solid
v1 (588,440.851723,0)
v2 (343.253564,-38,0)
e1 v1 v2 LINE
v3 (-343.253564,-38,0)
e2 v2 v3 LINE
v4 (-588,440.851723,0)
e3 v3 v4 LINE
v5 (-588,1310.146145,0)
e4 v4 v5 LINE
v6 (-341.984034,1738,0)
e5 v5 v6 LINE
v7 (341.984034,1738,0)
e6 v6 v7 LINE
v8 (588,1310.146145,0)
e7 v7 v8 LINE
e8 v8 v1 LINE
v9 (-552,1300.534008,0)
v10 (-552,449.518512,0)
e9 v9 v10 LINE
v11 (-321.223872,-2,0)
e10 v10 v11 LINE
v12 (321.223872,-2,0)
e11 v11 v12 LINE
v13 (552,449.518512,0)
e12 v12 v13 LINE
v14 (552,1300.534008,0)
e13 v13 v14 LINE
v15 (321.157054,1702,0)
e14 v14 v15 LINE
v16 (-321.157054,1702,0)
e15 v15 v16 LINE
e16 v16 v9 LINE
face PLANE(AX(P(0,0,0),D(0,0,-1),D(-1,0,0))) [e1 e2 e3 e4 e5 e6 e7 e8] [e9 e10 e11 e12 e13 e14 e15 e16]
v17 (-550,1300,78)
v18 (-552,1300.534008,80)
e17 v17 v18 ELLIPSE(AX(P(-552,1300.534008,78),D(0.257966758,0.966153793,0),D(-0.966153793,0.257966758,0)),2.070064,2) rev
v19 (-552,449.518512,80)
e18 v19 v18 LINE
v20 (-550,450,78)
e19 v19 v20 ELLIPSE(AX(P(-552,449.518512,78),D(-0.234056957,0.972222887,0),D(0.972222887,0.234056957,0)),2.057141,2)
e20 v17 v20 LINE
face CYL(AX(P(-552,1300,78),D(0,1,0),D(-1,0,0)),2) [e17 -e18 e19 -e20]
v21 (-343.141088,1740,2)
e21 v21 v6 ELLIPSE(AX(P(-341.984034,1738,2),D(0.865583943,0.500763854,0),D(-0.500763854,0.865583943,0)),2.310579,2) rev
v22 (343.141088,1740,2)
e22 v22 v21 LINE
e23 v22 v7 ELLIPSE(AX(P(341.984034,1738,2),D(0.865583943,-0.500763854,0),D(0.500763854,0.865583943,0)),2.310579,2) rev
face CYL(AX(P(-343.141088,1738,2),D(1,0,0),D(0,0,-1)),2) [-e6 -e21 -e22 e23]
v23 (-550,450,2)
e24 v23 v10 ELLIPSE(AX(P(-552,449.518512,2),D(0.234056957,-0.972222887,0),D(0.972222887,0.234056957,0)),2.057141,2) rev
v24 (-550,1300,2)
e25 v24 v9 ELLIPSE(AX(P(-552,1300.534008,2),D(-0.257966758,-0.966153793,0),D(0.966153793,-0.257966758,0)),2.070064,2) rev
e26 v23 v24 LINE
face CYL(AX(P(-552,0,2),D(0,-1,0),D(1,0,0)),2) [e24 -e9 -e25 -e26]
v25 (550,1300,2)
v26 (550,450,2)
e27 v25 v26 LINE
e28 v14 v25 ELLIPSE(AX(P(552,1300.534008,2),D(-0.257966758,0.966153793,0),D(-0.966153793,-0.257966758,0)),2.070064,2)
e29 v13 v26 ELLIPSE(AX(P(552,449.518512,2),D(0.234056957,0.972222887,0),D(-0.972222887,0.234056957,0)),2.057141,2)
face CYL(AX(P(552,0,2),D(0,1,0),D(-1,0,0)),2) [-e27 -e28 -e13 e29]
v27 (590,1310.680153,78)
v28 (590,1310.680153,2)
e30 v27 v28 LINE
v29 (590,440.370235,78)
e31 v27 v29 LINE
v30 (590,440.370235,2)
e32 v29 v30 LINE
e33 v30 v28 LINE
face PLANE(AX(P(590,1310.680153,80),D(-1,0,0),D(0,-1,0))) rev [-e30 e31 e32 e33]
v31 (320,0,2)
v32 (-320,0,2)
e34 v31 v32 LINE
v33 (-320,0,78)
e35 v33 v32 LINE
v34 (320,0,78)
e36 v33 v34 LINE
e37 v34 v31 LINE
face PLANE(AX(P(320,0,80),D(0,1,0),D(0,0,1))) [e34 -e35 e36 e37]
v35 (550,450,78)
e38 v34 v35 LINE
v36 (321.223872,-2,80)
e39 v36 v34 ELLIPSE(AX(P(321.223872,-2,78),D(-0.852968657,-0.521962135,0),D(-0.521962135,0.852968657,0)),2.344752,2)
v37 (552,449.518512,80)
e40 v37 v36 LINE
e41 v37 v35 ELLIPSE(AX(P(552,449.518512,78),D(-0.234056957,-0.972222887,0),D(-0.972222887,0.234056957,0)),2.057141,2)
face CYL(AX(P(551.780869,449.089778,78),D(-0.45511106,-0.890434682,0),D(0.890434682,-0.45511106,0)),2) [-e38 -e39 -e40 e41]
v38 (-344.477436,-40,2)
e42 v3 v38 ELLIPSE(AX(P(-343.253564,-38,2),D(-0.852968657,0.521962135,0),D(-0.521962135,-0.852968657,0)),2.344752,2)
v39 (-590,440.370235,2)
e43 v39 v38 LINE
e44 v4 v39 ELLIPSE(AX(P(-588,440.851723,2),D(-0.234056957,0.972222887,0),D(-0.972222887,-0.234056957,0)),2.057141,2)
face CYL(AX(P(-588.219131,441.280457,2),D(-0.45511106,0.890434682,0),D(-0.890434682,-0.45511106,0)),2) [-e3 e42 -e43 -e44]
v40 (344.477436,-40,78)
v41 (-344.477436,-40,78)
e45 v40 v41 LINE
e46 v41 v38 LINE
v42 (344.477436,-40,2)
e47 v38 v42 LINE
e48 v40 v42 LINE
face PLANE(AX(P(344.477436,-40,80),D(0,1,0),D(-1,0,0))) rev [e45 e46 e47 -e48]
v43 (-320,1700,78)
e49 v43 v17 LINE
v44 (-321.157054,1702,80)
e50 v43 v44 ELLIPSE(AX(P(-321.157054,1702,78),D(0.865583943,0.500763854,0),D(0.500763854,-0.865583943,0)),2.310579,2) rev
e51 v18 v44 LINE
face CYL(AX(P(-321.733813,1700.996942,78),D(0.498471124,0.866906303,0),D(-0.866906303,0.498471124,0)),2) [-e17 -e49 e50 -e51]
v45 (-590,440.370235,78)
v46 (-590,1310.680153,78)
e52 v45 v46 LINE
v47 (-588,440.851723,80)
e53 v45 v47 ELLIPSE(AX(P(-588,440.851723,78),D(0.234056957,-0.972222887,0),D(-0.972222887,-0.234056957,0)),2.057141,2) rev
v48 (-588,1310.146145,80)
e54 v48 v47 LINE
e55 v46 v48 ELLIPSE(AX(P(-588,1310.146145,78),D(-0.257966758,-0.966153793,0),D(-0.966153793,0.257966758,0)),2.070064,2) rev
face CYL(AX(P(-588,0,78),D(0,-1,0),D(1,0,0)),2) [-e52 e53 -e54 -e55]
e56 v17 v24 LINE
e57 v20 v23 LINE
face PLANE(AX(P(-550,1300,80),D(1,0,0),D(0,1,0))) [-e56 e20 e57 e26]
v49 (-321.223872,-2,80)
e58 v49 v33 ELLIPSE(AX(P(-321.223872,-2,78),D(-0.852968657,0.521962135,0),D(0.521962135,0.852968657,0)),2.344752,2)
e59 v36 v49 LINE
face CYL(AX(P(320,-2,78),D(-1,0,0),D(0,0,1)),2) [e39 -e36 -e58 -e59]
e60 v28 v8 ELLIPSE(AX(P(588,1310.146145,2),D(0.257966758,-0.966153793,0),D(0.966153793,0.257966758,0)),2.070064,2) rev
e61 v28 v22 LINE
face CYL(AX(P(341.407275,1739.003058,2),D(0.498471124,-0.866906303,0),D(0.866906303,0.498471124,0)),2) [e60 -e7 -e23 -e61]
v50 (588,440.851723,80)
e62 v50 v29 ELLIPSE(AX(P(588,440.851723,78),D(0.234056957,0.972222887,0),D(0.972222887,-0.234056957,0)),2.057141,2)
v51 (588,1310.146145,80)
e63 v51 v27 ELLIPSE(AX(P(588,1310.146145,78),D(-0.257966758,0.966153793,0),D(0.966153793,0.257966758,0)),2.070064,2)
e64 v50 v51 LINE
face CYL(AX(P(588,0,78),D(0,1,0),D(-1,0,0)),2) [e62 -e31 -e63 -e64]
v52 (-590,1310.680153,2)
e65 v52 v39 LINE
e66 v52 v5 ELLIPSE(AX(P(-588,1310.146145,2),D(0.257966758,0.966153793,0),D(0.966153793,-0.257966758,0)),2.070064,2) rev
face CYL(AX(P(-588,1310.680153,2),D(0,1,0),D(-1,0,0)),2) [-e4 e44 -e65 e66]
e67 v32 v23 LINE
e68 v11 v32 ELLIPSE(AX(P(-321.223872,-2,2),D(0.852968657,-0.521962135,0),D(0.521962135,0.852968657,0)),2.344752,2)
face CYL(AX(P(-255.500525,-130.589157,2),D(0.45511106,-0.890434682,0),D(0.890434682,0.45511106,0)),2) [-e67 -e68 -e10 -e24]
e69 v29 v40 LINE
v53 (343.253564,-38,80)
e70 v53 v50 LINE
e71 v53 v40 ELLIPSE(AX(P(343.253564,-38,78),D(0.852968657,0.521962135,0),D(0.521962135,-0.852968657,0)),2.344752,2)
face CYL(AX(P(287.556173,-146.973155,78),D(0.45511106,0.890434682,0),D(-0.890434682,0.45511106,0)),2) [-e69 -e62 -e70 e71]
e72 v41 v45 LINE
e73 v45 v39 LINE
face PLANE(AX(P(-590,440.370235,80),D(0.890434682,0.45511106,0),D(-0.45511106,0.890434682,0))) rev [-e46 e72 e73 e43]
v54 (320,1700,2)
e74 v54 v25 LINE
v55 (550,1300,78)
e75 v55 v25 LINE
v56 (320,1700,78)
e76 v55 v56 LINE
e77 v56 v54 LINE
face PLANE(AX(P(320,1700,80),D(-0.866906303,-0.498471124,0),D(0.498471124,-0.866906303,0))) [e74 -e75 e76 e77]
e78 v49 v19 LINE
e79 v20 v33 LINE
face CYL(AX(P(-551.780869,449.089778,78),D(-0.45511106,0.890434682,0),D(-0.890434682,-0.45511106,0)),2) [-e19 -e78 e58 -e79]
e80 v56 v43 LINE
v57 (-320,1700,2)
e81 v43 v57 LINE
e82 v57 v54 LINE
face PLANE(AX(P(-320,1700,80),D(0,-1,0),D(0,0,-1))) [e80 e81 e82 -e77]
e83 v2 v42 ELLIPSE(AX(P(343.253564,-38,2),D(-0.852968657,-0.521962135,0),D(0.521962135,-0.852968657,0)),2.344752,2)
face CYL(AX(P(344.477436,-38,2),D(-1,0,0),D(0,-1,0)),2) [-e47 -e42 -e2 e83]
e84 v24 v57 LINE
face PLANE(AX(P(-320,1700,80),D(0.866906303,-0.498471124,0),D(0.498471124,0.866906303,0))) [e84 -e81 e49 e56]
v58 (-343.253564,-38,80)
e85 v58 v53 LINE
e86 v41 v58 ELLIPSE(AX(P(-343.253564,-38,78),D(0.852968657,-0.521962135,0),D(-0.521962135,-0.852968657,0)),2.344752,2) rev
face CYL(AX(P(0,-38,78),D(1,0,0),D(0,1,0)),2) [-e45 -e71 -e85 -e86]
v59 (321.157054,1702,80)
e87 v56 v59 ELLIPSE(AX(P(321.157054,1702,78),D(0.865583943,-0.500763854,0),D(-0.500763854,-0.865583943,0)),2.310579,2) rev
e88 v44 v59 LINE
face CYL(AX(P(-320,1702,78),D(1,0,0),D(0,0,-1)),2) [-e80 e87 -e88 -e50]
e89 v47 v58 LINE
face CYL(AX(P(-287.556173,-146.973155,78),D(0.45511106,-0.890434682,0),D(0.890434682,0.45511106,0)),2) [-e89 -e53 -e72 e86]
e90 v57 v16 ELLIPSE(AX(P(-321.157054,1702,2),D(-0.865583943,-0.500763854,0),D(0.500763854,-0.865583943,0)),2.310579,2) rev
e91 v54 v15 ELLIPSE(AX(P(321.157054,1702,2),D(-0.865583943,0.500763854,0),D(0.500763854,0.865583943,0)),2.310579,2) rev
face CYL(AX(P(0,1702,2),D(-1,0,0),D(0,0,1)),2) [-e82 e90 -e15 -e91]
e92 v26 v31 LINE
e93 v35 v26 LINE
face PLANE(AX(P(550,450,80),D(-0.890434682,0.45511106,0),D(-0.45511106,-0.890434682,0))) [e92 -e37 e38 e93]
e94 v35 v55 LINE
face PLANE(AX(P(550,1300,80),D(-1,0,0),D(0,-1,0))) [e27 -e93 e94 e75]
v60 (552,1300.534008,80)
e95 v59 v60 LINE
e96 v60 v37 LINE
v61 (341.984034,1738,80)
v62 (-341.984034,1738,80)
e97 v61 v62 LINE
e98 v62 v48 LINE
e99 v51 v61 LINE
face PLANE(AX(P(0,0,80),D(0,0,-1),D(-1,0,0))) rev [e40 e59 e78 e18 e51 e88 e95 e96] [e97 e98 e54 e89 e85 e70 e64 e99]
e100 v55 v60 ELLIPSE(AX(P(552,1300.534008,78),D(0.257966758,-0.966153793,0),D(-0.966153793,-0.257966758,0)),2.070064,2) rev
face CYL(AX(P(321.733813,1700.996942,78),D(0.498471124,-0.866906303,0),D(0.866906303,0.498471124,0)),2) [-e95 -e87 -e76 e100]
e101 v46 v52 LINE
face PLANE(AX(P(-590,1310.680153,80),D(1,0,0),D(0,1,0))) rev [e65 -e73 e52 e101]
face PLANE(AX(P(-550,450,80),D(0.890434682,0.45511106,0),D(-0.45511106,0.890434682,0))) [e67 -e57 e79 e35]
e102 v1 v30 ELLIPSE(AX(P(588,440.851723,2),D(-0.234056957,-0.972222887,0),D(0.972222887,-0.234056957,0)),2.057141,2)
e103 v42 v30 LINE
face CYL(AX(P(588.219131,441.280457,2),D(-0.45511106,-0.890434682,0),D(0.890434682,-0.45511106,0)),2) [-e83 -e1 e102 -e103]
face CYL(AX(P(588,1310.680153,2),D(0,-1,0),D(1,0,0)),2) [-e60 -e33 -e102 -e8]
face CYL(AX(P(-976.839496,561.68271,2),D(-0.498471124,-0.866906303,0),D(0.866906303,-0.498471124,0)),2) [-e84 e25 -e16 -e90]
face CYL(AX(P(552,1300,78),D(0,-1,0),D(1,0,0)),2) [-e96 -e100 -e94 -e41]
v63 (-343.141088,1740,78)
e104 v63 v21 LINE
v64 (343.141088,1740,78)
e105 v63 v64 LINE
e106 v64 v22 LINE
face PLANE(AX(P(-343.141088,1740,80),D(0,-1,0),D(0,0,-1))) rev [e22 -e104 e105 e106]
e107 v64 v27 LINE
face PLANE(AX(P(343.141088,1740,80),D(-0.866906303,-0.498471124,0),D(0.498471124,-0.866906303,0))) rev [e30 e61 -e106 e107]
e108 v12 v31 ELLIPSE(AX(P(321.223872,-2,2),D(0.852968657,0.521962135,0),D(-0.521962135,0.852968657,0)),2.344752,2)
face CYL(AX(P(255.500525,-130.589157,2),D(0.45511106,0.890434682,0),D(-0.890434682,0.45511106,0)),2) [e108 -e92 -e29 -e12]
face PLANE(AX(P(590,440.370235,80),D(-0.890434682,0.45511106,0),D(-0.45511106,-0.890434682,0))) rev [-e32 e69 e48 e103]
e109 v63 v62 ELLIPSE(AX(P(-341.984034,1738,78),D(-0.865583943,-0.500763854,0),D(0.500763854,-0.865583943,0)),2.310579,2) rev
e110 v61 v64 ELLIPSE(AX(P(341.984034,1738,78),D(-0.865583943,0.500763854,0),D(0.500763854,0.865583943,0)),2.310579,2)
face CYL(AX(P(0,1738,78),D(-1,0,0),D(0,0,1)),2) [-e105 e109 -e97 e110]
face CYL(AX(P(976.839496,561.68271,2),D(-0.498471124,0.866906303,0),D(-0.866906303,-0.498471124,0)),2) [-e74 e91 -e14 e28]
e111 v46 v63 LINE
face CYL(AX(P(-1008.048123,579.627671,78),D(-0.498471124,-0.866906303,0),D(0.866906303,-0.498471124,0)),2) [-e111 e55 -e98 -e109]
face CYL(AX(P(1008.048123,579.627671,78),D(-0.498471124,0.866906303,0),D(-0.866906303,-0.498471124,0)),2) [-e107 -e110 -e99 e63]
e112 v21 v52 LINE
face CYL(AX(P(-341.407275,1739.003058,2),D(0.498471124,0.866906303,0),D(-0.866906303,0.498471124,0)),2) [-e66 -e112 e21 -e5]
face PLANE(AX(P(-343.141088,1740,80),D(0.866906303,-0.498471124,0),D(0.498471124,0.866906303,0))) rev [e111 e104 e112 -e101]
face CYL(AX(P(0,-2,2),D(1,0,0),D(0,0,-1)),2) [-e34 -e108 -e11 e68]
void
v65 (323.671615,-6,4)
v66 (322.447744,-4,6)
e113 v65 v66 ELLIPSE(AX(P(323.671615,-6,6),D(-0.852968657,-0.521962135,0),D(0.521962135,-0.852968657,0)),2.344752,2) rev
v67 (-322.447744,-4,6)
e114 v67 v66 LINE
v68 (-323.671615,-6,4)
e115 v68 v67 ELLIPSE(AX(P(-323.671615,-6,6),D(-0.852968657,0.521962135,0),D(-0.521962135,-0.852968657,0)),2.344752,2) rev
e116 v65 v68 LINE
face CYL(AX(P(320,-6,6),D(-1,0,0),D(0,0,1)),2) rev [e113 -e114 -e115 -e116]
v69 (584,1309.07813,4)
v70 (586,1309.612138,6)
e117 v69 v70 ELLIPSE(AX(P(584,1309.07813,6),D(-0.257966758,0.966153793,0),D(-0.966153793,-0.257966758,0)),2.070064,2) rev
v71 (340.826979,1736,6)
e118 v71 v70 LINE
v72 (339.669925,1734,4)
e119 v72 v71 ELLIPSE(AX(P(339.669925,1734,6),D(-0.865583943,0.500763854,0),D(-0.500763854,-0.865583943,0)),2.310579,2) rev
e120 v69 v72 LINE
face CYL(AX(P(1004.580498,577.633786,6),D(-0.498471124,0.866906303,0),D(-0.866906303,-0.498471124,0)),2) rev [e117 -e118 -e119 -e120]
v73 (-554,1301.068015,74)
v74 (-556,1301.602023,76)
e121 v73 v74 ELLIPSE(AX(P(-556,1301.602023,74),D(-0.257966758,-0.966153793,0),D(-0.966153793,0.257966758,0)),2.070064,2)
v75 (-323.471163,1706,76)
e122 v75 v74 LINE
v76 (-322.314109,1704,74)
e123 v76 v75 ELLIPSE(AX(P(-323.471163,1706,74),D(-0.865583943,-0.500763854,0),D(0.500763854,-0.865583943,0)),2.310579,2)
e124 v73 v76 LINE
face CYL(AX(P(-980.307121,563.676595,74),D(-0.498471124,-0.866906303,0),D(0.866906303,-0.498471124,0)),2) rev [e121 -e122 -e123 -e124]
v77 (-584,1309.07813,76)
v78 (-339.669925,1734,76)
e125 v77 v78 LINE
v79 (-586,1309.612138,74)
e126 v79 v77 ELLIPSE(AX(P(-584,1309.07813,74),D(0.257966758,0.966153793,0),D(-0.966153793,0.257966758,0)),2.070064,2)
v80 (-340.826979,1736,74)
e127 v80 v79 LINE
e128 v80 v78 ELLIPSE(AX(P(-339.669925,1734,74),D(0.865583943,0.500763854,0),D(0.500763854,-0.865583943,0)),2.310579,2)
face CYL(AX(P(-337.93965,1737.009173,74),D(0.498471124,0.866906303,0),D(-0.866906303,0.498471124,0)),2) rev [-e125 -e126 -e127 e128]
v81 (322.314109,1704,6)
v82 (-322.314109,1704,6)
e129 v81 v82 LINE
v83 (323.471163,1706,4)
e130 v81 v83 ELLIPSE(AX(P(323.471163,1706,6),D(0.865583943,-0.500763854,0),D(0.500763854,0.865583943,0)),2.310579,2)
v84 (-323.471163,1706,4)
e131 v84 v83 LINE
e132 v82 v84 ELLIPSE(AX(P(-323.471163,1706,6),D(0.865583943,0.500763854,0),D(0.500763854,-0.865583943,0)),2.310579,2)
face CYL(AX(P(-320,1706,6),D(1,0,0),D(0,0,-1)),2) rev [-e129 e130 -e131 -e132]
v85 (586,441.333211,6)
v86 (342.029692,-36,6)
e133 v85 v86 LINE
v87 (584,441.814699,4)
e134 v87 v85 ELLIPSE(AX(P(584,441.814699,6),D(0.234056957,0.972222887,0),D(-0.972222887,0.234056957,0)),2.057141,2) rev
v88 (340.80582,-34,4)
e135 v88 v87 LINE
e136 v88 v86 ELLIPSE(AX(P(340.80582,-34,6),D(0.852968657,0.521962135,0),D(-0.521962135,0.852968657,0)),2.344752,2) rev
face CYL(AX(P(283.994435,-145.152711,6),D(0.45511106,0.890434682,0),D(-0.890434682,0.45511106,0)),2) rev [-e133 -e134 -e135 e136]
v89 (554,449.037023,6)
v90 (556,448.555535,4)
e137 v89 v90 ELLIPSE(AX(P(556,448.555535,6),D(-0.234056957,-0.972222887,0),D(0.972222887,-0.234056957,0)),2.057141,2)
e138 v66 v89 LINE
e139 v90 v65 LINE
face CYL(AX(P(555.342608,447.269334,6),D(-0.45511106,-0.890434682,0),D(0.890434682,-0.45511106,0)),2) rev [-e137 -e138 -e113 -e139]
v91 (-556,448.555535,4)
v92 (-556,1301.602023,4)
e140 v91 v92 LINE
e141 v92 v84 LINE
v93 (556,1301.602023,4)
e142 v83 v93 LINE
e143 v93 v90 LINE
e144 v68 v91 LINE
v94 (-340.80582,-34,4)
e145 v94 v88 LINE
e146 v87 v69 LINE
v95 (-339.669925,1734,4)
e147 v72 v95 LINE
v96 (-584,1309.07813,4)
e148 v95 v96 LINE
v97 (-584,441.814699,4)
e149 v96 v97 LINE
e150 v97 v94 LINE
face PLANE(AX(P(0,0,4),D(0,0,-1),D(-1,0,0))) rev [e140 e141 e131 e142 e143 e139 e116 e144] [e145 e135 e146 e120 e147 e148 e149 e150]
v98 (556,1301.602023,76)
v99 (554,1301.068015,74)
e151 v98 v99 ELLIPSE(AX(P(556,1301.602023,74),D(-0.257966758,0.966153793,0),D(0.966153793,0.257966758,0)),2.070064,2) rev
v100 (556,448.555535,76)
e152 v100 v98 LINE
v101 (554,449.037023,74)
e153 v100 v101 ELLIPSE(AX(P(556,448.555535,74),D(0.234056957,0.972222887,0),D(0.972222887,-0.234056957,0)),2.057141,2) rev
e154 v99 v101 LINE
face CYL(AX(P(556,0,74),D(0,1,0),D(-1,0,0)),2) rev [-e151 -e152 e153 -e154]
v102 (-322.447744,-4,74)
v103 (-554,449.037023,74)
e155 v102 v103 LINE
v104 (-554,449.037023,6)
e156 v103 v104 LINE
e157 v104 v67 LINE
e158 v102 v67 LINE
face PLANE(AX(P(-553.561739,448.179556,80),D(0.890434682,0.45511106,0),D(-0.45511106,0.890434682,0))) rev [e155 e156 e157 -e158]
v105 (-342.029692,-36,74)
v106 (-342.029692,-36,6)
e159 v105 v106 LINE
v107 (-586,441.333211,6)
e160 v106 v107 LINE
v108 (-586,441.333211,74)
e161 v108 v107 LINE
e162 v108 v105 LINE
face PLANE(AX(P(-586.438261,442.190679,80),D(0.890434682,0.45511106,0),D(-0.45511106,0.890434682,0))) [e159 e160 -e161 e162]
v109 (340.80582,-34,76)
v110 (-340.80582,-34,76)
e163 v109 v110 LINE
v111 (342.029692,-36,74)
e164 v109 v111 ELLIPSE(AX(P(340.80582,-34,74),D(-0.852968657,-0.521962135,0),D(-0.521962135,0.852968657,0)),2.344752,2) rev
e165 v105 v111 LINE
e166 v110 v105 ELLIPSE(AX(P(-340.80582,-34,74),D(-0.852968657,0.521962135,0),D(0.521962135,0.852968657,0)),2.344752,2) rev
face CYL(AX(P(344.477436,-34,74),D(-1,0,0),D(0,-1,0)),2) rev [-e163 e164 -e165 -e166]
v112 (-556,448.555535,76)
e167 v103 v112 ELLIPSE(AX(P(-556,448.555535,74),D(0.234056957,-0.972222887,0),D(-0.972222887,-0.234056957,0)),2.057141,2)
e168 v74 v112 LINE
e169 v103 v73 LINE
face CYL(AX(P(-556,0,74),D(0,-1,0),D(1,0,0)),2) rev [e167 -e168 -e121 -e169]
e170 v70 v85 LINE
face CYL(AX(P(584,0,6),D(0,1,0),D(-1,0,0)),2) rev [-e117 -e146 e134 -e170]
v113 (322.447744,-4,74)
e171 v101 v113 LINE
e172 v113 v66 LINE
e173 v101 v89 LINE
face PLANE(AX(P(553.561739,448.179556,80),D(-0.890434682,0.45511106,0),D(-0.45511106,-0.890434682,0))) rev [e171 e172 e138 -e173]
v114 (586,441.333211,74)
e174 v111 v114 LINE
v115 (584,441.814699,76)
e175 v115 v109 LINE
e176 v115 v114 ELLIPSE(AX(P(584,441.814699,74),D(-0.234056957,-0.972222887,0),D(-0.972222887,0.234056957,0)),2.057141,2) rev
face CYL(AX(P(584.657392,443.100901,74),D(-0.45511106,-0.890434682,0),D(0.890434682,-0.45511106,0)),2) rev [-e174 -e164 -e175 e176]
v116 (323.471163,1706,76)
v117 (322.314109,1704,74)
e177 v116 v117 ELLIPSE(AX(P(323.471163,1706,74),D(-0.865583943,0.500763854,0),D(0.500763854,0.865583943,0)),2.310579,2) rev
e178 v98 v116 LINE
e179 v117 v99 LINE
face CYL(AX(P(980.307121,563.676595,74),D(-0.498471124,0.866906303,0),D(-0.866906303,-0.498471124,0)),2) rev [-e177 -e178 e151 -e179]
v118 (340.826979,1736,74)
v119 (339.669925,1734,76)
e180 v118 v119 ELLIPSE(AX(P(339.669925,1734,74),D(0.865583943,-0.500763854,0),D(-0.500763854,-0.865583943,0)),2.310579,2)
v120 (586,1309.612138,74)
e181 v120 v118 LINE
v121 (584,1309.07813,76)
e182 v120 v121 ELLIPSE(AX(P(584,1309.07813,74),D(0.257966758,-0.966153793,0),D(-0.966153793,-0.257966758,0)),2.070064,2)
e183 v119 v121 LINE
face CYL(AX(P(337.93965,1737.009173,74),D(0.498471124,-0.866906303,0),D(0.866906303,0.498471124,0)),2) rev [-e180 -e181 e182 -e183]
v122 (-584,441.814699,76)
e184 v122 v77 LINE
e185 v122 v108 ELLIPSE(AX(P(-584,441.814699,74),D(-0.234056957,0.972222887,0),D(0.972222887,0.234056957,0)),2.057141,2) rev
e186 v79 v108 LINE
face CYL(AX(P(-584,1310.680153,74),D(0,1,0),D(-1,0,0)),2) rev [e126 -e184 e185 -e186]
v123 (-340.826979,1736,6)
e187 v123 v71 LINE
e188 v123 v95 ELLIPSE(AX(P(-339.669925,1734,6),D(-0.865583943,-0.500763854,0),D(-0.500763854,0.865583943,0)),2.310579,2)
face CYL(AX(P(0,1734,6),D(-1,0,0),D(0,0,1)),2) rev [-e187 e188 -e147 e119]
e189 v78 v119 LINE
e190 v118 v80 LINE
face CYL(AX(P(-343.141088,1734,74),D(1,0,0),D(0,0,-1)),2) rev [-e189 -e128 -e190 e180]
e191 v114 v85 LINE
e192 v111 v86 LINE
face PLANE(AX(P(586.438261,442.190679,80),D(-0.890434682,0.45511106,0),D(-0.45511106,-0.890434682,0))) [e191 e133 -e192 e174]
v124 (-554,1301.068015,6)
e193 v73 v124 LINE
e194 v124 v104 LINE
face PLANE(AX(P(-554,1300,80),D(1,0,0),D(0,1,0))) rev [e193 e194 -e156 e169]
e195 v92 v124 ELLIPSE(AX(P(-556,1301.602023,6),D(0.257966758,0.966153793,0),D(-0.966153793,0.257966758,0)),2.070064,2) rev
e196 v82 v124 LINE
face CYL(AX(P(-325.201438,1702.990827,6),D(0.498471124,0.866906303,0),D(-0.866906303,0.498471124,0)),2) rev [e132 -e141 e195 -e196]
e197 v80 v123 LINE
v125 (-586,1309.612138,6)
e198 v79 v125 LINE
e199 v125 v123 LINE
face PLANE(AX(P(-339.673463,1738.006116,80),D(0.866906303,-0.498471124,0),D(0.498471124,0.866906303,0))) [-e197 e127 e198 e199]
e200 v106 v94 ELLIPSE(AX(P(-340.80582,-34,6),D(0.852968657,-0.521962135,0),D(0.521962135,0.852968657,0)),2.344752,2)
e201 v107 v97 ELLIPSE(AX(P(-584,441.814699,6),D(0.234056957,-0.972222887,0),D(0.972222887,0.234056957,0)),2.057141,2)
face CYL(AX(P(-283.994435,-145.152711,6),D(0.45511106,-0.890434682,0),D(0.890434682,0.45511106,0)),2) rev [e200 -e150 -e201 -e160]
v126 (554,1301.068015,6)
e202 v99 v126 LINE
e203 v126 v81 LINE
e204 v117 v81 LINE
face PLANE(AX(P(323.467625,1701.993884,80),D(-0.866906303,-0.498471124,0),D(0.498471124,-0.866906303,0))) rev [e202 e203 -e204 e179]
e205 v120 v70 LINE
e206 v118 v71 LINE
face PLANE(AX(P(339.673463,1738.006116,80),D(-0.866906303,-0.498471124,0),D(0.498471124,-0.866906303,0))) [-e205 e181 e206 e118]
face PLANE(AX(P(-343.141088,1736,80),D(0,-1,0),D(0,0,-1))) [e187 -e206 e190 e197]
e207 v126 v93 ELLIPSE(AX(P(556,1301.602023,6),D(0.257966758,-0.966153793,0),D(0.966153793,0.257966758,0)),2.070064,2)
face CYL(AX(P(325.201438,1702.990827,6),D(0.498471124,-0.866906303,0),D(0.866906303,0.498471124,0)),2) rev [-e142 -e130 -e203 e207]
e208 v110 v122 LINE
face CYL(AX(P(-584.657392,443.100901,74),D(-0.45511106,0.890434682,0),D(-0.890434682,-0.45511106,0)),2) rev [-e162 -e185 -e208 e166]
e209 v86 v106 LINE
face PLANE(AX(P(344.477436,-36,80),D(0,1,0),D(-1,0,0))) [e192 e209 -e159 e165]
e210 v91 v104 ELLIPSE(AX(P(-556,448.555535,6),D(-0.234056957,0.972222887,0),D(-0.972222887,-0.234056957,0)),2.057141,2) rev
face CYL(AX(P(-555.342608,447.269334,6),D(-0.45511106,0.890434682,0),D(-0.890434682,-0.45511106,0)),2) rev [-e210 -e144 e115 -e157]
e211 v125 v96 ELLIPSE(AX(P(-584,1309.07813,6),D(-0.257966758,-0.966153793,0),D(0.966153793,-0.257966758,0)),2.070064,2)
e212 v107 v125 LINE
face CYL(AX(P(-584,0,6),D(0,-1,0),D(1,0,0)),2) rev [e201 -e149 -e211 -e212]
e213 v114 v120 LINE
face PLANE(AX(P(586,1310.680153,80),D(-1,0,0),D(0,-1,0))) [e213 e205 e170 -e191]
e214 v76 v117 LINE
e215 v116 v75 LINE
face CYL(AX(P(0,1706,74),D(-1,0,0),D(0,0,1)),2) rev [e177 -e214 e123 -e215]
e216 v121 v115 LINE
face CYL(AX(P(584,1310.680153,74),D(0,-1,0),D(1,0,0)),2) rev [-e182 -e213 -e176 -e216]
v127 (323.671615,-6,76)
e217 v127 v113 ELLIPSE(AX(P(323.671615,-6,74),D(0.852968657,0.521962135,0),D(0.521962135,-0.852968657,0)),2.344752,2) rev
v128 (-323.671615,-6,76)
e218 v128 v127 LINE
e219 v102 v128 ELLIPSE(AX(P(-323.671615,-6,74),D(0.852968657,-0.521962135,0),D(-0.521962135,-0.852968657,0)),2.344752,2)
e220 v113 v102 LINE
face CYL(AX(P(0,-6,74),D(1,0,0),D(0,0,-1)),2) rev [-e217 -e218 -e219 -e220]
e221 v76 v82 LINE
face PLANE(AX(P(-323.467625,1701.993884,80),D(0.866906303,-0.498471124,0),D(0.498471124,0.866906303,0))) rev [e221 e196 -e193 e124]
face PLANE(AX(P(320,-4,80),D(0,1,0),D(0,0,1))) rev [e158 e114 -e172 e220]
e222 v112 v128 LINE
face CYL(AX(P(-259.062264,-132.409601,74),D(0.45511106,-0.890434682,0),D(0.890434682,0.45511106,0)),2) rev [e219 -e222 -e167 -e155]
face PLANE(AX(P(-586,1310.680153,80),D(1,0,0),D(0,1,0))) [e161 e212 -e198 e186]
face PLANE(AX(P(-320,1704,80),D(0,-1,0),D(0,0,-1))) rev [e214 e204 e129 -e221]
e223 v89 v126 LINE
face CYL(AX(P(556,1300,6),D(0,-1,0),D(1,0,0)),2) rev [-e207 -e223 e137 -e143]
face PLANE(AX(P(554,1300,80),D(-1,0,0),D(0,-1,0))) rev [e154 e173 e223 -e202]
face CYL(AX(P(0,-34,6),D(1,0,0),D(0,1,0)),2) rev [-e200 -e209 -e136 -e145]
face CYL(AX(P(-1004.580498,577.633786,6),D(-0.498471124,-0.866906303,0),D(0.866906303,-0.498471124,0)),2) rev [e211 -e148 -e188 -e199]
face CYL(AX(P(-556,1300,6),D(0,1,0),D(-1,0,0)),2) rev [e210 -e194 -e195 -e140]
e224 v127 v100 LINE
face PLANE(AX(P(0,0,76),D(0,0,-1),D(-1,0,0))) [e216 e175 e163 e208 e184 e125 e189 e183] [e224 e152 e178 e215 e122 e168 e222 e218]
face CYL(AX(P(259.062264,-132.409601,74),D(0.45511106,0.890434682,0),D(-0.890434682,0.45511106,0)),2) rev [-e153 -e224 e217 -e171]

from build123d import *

# Parameters (mm, degrees)
BOSS_EXTRU_1_DEPTH = 80
COQUE1_START       = 4
COQUE1_DEPTH       = 72
CONG_1_R           = 2


# Read off the part's stored shape, not the designer's step: Coque1
with BuildPart() as part:
    # Esquisse1 → Boss.-Extru.1 (new body)
    with BuildSketch(Plane.XY):
        Polygon((-590, 1310.680153009), (-590, 440.370234654), (-344.477435621, -40), (344.477435621, -40), (590, 440.370234654), (590, 1310.680153009), (343.14108798, 1740), (-343.14108798, 1740), align=None)
        Polygon((-320, 1700), (320, 1700), (550, 1300), (550, 450), (320, 0), (-320, 0), (-550, 450), (-550, 1300), align=None, mode=Mode.SUBTRACT)
    extrude(amount=BOSS_EXTRU_1_DEPTH)

    # Coque1 outline → Coque1 (cut)
    with BuildSketch(Plane.XY.offset(COQUE1_START)):
        Polygon((-340.826979182, 1736), (-586, 1309.612137708), (-586, 441.333211189), (-342.029692059, -36), (342.029692059, -36), (586, 441.333211189), (586, 1309.612137708), (340.826979182, 1736), align=None)
        Polygon((-554, 449.037023465), (-554, 1301.068015301), (-322.314108798, 1704), (322.314108798, 1704), (554, 1301.068015301), (554, 449.037023465), (322.447743562, -4), (-322.447743562, -4), align=None, mode=Mode.SUBTRACT)
    extrude(amount=COQUE1_DEPTH, mode=Mode.SUBTRACT)

    # Congé1
    cong_1_edges = [part.edges().sort_by_distance(p)[0] for p in [
        (-467.238717811, 200.185117327, 80),
        (-590, 875.525193832, 0),
        (-466.57054399, 1525.340076505, 0),
        (0, -40, 80),
        (467.238717811, 200.185117327, 80),
        (590, 875.525193832, 80),
        (466.57054399, 1525.340076505, 80),
        (0, 1740, 80),
        (-435, 1500, 0),
        (-550, 875, 0),
        (-435, 225, 0),
        (0, 0, 0),
        (435, 225, 0),
        (550, 875, 0),
        (435, 1500, 0),
        (0, 1700, 0),
        (-435, 1500, 80),
        (-550, 875, 80),
        (-435, 225, 80),
        (0, 0, 80),
        (435, 225, 80),
        (550, 875, 80),
        (435, 1500, 80),
        (0, 1700, 80),
        (-466.57054399, 1525.340076505, 80),
        (-463.413489591, 1522.806068854, 76),
        (-586, 875.472674449, 76),
        (-464.01484603, 202.666605594, 76),
        (0, -36, 76),
        (464.01484603, 202.666605594, 76),
        (586, 875.472674449, 76),
        (463.413489591, 1522.806068854, 76),
        (0, 1736, 76),
        (0, 1704, 4),
        (-438.157054399, 1502.53400765, 4),
        (-554, 875.052519383, 4),
        (-438.223871781, 222.518511733, 4),
        (0, -4, 4),
        (438.223871781, 222.518511733, 4),
        (554, 875.052519383, 4),
        (438.157054399, 1502.53400765, 4),
        (-463.413489591, 1522.806068854, 4),
        (-586, 875.472674449, 4),
        (-464.01484603, 202.666605594, 4),
        (0, -36, 4),
        (464.01484603, 202.666605594, 4),
        (586, 875.472674449, 4),
        (463.413489591, 1522.806068854, 4),
        (0, 1736, 4),
        (-438.157054399, 1502.53400765, 76),
        (-554, 875.052519383, 76),
        (-438.223871781, 222.518511733, 76),
        (0, -4, 76),
        (438.223871781, 222.518511733, 76),
        (554, 875.052519383, 76),
        (438.157054399, 1502.53400765, 76),
        (0, 1704, 76),
        (-590, 875.525193832, 80),
        (0, 1740, 0),
        (466.57054399, 1525.340076505, 0),
        (590, 875.525193832, 0),
        (467.238717811, 200.185117327, 0),
        (0, -40, 0),
        (-467.238717811, 200.185117327, 0),
    ]]
    fillet(cong_1_edges, radius=CONG_1_R)


solid = part.part
